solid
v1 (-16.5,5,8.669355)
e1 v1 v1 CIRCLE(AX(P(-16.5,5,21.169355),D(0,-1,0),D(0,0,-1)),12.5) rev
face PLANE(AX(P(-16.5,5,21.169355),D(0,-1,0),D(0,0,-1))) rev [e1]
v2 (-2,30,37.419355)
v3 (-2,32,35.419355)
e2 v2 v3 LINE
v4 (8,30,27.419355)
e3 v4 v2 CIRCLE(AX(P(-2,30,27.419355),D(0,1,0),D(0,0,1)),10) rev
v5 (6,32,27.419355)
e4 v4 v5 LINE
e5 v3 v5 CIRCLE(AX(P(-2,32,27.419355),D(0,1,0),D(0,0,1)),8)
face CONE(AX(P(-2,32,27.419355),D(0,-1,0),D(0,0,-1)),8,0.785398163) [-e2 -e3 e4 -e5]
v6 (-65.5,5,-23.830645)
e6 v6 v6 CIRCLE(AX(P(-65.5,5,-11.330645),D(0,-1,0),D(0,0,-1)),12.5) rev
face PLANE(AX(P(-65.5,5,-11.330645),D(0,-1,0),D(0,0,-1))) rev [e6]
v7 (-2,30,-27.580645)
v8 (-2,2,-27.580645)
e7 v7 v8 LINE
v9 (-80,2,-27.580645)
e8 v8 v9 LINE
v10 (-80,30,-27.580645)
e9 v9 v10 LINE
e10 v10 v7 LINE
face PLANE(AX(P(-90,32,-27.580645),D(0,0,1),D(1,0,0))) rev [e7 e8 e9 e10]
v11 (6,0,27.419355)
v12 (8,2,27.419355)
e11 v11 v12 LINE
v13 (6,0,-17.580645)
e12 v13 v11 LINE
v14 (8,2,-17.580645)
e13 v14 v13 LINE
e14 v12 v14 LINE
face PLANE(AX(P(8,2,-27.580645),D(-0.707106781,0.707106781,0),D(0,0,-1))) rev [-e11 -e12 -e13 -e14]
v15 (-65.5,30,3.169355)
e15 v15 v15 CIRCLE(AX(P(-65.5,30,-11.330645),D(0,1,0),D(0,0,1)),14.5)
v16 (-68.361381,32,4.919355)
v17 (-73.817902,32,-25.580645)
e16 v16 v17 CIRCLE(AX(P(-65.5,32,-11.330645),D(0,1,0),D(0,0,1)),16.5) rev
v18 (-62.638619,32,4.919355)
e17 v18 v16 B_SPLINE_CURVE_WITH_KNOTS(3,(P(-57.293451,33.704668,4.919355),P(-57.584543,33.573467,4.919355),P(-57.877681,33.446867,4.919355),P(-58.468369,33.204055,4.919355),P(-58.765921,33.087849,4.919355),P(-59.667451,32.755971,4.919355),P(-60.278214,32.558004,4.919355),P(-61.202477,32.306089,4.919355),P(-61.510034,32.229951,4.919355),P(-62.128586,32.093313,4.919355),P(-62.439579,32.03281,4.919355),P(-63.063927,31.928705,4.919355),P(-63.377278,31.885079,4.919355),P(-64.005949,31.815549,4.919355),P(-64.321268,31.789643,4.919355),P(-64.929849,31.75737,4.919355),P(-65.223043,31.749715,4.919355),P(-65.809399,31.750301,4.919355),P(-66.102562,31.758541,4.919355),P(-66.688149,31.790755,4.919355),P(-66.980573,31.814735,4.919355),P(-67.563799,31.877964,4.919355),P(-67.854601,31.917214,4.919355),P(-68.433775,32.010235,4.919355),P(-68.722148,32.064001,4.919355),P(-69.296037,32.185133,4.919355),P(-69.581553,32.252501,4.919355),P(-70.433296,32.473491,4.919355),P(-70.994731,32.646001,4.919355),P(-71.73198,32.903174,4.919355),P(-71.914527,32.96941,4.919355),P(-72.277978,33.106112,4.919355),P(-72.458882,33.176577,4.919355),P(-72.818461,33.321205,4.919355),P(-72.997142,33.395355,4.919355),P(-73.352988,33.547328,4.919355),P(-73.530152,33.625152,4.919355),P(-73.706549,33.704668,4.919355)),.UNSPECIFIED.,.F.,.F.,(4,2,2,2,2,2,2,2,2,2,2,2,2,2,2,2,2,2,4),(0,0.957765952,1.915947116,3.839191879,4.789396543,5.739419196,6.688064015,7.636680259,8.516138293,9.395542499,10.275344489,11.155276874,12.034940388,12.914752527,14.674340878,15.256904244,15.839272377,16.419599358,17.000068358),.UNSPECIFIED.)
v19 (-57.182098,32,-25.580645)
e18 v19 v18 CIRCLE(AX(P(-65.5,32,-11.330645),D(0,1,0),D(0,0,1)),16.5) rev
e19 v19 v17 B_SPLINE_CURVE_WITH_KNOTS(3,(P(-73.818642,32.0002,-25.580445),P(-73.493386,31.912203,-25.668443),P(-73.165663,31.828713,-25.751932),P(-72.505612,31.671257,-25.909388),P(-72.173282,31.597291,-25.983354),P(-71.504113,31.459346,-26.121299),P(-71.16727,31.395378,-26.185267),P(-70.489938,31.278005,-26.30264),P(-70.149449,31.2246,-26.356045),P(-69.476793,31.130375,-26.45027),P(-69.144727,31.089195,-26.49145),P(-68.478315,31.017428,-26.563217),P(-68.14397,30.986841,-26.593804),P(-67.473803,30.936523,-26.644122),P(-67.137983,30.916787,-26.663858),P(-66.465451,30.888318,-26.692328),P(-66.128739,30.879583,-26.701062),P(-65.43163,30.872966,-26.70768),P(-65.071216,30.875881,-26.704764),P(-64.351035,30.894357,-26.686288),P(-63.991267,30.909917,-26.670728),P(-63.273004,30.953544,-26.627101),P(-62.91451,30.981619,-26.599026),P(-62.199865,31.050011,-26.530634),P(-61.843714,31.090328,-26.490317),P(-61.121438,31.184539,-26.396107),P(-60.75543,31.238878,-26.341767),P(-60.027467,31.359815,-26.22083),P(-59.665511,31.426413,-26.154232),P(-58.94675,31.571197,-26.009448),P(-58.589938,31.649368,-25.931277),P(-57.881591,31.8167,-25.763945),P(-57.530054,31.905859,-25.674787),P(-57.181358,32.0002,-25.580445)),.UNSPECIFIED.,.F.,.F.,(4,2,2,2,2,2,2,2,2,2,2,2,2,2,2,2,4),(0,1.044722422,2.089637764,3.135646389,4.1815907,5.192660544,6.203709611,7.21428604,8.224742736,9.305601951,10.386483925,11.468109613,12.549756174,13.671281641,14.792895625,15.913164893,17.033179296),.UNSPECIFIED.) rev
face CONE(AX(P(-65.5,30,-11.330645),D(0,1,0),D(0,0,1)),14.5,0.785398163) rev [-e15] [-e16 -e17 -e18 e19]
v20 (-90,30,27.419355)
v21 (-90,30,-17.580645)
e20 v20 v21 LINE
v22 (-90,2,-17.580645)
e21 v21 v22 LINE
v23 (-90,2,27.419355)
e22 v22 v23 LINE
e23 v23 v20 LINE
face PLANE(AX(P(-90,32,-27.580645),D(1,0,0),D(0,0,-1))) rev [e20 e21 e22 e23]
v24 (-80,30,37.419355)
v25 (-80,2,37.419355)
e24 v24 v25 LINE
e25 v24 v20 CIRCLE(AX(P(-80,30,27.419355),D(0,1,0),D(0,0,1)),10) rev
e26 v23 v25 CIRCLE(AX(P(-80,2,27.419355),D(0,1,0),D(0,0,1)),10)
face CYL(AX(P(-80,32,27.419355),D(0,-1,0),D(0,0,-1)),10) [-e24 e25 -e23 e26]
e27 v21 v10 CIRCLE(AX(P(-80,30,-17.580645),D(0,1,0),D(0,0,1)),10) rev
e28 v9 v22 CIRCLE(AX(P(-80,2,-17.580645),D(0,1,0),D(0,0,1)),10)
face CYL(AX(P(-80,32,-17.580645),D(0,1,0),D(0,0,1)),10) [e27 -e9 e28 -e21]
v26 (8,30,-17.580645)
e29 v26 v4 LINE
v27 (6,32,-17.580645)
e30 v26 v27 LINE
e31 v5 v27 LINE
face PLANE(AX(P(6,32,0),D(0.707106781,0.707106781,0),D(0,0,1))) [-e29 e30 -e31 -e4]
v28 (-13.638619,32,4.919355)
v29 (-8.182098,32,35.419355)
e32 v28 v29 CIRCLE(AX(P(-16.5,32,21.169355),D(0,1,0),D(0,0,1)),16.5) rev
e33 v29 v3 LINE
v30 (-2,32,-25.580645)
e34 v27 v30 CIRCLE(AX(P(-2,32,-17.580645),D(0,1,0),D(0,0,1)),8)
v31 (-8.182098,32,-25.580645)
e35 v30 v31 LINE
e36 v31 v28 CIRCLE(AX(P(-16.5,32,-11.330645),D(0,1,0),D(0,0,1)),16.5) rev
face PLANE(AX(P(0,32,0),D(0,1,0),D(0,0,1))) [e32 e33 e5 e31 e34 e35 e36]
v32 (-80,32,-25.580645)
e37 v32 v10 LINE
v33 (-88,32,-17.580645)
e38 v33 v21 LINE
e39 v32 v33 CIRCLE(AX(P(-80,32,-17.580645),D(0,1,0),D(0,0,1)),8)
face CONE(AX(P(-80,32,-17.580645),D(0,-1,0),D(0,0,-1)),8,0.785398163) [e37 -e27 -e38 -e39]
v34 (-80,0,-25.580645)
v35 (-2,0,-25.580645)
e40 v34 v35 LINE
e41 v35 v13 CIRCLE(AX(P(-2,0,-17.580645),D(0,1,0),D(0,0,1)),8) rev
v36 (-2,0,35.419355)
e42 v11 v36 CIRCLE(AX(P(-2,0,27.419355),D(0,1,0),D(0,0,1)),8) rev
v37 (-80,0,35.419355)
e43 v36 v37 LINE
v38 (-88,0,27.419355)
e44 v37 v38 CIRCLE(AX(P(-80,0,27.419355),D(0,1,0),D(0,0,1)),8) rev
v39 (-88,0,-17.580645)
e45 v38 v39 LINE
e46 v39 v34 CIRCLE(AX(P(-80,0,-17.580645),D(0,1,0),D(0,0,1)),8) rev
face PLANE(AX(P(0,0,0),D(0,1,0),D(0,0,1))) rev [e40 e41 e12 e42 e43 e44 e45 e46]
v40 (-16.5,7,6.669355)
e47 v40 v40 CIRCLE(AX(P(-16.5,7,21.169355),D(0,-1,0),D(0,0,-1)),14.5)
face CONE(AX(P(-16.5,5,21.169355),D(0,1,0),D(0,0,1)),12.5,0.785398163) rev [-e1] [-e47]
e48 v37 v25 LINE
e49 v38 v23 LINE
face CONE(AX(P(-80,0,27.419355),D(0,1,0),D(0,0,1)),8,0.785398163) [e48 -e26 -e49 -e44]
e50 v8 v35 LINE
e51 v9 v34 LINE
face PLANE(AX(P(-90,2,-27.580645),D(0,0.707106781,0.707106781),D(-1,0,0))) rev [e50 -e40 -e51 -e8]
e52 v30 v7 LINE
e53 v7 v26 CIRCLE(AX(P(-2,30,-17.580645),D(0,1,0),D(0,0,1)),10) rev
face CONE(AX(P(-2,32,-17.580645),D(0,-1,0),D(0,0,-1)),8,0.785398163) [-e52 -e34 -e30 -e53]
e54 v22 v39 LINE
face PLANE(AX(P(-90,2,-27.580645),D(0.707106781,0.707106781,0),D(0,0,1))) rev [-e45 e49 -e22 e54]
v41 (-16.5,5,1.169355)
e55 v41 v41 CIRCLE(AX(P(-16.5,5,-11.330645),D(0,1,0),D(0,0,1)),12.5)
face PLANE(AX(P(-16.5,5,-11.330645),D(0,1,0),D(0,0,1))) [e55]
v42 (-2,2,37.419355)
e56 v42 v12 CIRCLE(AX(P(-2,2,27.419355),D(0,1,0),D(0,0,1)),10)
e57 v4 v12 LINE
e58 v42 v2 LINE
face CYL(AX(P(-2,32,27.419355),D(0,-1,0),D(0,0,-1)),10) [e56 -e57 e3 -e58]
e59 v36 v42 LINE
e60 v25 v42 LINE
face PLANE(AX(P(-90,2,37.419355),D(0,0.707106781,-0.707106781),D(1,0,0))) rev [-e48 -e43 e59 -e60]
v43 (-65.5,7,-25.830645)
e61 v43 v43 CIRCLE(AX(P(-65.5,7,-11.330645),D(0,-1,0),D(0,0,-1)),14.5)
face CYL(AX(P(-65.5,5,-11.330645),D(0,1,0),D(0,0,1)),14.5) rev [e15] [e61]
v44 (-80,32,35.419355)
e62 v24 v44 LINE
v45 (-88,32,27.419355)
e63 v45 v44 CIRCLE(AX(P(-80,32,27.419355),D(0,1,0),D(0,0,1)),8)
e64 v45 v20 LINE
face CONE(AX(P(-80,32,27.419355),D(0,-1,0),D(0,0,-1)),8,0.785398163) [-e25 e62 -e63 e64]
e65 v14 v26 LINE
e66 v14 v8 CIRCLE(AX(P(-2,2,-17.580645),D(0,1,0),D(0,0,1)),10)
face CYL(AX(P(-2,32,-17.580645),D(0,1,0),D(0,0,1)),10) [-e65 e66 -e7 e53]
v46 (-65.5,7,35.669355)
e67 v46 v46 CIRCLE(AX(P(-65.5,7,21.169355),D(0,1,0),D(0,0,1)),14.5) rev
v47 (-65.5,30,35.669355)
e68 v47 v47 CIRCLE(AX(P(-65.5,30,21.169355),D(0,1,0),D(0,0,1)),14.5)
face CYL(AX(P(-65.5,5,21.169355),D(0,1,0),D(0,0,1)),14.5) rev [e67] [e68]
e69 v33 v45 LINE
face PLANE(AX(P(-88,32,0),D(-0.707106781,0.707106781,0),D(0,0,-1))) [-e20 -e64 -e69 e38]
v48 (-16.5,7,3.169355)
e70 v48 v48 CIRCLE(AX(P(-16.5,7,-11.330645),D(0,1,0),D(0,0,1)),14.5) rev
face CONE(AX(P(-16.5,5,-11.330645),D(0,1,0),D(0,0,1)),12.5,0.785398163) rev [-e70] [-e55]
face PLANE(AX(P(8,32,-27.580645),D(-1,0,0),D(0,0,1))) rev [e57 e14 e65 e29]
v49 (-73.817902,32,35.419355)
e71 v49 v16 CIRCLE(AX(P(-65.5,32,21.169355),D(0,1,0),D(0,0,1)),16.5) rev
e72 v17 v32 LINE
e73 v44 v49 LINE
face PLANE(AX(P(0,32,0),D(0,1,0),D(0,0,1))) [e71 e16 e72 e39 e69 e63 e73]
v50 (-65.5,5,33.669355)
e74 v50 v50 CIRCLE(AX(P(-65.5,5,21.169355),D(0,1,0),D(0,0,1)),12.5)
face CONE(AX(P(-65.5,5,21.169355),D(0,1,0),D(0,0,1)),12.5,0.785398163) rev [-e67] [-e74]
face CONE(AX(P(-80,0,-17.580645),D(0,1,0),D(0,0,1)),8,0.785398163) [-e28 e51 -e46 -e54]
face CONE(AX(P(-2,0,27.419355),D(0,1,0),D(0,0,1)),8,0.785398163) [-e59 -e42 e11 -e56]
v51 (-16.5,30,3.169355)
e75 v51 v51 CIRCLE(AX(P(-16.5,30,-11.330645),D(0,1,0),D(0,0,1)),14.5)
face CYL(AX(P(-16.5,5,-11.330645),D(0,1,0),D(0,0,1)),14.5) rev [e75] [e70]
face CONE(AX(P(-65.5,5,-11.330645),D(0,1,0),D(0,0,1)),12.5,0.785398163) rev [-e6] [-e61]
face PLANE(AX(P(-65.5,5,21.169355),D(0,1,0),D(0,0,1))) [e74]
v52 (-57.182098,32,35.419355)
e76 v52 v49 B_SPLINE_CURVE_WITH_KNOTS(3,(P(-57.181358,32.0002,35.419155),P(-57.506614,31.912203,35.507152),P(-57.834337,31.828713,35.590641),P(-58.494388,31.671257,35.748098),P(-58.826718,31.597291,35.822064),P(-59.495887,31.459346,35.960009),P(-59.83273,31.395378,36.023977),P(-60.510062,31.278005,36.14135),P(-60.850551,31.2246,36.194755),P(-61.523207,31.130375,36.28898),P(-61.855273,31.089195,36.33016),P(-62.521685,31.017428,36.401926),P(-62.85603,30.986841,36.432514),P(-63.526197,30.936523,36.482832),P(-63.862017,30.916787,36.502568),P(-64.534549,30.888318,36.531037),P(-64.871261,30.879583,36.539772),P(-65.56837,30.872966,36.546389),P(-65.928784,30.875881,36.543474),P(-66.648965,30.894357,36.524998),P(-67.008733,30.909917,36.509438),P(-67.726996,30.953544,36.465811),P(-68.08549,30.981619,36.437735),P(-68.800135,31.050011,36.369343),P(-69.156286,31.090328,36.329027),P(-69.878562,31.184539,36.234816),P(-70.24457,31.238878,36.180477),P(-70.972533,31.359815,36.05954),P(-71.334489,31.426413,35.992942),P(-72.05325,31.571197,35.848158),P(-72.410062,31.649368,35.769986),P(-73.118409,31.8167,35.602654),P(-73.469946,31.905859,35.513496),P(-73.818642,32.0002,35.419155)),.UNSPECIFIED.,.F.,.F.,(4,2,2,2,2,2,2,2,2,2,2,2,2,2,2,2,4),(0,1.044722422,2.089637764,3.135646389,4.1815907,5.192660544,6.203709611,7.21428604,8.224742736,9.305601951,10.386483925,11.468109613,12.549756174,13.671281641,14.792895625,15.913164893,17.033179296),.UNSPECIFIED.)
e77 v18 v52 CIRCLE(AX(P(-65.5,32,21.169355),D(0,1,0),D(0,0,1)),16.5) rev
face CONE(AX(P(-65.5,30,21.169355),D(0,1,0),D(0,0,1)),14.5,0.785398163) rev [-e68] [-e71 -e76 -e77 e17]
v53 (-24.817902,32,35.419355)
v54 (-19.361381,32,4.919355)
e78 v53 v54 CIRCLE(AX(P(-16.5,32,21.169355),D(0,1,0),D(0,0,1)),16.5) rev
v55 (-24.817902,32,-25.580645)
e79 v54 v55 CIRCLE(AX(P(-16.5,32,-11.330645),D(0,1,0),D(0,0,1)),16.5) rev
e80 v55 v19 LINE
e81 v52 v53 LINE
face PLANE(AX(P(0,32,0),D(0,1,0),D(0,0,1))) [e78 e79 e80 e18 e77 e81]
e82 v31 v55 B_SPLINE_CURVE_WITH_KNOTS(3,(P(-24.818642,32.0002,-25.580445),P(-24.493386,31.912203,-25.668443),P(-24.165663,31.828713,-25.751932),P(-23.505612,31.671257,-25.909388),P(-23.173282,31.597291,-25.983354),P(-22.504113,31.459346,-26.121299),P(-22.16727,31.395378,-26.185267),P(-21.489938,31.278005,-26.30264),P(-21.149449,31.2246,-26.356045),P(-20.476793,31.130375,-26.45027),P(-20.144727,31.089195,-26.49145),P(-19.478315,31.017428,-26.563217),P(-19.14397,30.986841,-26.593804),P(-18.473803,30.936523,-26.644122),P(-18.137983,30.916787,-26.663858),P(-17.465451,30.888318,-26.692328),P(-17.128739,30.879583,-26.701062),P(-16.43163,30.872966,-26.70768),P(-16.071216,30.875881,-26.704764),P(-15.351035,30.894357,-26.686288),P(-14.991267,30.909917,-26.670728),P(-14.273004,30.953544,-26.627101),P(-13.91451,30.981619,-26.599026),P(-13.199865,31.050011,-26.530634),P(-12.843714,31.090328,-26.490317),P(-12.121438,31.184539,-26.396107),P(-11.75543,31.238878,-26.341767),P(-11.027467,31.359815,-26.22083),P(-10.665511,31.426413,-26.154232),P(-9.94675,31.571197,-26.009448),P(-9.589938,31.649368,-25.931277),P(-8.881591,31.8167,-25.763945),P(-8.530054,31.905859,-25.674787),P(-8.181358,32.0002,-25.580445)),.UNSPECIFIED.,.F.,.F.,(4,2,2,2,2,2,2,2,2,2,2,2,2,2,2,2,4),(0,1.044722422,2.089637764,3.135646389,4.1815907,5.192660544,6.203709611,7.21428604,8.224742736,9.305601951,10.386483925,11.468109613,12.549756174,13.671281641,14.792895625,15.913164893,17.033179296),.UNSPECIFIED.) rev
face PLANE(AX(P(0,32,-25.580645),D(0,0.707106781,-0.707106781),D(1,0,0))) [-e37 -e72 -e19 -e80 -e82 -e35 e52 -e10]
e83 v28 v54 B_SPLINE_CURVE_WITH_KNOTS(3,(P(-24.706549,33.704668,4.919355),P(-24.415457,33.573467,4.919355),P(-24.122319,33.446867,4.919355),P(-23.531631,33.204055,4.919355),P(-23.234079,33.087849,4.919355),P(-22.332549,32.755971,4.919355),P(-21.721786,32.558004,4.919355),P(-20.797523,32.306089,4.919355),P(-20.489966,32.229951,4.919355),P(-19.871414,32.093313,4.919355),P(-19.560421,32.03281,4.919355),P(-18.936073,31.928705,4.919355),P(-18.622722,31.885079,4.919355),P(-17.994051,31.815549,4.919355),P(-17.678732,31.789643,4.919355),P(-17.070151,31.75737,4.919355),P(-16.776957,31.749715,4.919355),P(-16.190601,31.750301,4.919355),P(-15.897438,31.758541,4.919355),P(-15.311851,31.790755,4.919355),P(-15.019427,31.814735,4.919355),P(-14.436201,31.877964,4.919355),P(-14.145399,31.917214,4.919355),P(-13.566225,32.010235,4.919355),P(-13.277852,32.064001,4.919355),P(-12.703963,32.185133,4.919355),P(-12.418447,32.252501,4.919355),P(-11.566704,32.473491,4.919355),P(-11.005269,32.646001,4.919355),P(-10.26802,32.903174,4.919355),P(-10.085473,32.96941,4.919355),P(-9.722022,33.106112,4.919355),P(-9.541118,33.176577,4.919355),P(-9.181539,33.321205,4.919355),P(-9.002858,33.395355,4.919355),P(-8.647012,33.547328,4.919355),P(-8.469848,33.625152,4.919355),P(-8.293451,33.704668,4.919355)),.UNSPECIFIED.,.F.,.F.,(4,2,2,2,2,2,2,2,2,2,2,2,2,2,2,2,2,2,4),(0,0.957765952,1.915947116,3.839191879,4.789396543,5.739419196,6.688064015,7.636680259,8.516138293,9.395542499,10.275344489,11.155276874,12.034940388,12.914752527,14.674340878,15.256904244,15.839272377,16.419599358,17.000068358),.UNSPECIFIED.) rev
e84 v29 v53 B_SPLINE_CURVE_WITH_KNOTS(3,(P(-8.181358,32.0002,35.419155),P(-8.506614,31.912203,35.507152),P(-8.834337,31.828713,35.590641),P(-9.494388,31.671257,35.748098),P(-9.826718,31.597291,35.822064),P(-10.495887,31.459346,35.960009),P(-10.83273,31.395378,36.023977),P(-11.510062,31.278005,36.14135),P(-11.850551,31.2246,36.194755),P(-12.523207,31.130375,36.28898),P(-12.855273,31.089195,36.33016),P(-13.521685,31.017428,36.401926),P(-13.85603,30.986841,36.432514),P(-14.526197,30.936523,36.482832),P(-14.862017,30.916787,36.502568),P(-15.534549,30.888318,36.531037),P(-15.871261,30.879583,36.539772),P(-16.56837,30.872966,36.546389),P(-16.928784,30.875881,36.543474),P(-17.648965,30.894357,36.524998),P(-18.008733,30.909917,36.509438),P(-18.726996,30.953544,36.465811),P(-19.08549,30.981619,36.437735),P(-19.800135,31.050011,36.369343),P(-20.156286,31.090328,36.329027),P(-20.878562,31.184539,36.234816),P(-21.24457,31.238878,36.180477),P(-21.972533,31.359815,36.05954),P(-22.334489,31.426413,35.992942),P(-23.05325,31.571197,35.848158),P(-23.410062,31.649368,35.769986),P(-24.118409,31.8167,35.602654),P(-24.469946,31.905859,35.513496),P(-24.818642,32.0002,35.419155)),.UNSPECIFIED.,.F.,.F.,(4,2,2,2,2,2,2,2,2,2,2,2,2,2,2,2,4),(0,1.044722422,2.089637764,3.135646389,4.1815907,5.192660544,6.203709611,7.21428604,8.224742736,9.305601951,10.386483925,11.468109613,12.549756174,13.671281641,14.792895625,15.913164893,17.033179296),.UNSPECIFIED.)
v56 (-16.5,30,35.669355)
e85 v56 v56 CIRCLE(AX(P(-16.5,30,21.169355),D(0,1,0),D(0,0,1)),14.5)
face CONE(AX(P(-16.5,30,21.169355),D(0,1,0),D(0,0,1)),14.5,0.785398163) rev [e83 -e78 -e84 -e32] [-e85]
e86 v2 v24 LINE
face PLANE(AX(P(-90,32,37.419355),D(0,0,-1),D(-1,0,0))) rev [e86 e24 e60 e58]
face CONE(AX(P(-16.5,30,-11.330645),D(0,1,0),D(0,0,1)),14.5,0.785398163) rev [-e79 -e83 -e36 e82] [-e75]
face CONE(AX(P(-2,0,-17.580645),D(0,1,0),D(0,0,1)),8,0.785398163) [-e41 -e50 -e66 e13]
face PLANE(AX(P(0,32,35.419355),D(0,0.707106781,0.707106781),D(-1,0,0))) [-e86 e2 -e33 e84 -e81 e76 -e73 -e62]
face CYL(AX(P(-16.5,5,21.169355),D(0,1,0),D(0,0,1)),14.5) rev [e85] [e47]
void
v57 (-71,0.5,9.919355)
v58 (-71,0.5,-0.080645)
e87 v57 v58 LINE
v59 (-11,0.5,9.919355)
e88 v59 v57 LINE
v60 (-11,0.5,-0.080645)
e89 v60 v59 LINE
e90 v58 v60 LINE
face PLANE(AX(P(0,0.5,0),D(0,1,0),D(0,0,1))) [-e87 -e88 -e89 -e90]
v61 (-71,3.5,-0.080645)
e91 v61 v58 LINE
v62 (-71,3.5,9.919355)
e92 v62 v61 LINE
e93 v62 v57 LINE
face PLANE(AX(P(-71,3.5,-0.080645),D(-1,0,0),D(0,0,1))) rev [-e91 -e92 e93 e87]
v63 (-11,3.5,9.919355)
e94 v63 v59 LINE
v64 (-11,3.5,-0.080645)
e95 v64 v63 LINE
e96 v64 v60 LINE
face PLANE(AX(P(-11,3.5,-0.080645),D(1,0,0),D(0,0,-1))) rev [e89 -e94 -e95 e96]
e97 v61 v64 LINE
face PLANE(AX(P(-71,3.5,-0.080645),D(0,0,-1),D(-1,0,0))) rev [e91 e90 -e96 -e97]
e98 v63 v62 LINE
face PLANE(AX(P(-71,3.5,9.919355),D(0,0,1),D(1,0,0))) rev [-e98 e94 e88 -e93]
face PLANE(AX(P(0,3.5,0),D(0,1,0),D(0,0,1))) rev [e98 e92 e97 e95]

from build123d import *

# Parameters (mm, degrees)
SKETCH1_W           = 98
SKETCH1_H           = 65
BOSS_EXTRUDE1_DEPTH = 32
SKETCH2_R           = 14.5
CUT_EXTRUDE1_DEPTH  = 27
FILLET1_R           = 10
FILLET2_R           = 10
FILLET3_R           = 10
FILLET4_R           = 10
CHAMFER1_SIZE       = 2
CUT_EXTRUDE2_START  = -0.5
SKETCH3_W           = 60
SKETCH3_H           = 10
CUT_EXTRUDE2_DEPTH  = 3


with BuildPart() as part:
    # Sketch1 → Boss-Extrude1 (new body)
    with BuildSketch(Plane(origin=(0, 0, 0), x_dir=(1, 0, 0), z_dir=(0, 1, 0))):
        with Locations((-41, -4.919354839)):
            Rectangle(SKETCH1_W, SKETCH1_H)
    extrude(amount=BOSS_EXTRUDE1_DEPTH)

    # Sketch2 → Cut-Extrude1 (cut)
    with BuildSketch(Plane(origin=(0, 32, 0), x_dir=(1, 0, 0), z_dir=(0, 1, 0))):
        with Locations(Location((-16.5, 11.330645161, 0), (0, 0, 270))):
            Circle(SKETCH2_R)
        with Locations(Location((-16.5, -21.169354839, 0), (0, 0, 90))):
            Circle(SKETCH2_R)
        with Locations(Location((-65.5, 11.330645161, 0), (0, 0, 90))):
            Circle(SKETCH2_R)
        with Locations(Location((-65.5, -21.169354839, 0), (0, 0, 270))):
            Circle(SKETCH2_R)
    extrude(amount=-CUT_EXTRUDE1_DEPTH, mode=Mode.SUBTRACT)

    # Fillet1
    fillet1_edges = [part.edges().sort_by_distance(p)[0] for p in [
        (8, 16, -27.580645161),
    ]]
    fillet(fillet1_edges, radius=FILLET1_R)

    # Fillet2
    fillet2_edges = [part.edges().sort_by_distance(p)[0] for p in [
        (-90, 16, 37.419354839),
    ]]
    fillet(fillet2_edges, radius=FILLET2_R)

    # Fillet3
    fillet3_edges = [part.edges().sort_by_distance(p)[0] for p in [
        (-90, 16, -27.580645161),
    ]]
    fillet(fillet3_edges, radius=FILLET3_R)

    # Fillet4
    fillet4_edges = [part.edges().sort_by_distance(p)[0] for p in [
        (8, 16, 37.419354839),
    ]]
    fillet(fillet4_edges, radius=FILLET4_R)

    # Chamfer1
    # the kernel refuses this chamfer: 2 mm, written as the material it adds along each edge
    with BuildSketch(Plane(origin=(-16.5, 5, 21.169354839), x_dir=(0, 0, -1), z_dir=(1, 0, 0))) as chamfer1_piece_1:
        Polygon((14.5, CHAMFER1_SIZE), (14.5 - CHAMFER1_SIZE, 0), (14.5, 0), align=None)
    revolve(axis=Axis((-16.5, 5, 21.169354839), (0, 1, 0)))
    with BuildSketch(Plane(origin=(-65.5, 5, -11.330645161), x_dir=(0, 0, -1), z_dir=(1, 0, 0))) as chamfer1_piece_2:
        Polygon((14.5, CHAMFER1_SIZE), (14.5 - CHAMFER1_SIZE, 0), (14.5, 0), align=None)
    revolve(axis=Axis((-65.5, 5, -11.330645161), (0, 1, 0)))
    with BuildSketch(Plane(origin=(-65.5, 5, 21.169354839), x_dir=(0, 0, 1), z_dir=(-1, 0, 0))) as chamfer1_piece_3:
        Polygon((14.5, CHAMFER1_SIZE), (14.5 - CHAMFER1_SIZE, 0), (14.5, 0), align=None)
    revolve(axis=Axis((-65.5, 5, 21.169354839), (0, 1, 0)))
    with BuildSketch(Plane(origin=(-16.5, 5, -11.330645161), x_dir=(0, 0, 1), z_dir=(-1, 0, 0))) as chamfer1_piece_4:
        Polygon((14.5, CHAMFER1_SIZE), (14.5 - CHAMFER1_SIZE, 0), (14.5, 0), align=None)
    revolve(axis=Axis((-16.5, 5, -11.330645161), (0, 1, 0)))
    # the kernel refuses this chamfer: 2 mm, written as the material it takes off along each edge
    with BuildSketch(Plane(origin=(-16.5, 32, 21.169354839), x_dir=(0, 0, -1), z_dir=(1, 0, 0))) as chamfer1_2_piece_1:
        Polygon((14.5 + CHAMFER1_SIZE, 0), (14.5, -CHAMFER1_SIZE), (14.5, 0), align=None)
    revolve(axis=Axis((-16.5, 32, 21.169354839), (0, 1, 0)), mode=Mode.SUBTRACT)
    with BuildSketch(Plane(origin=(-65.5, 32, -11.330645161), x_dir=(0, 0, -1), z_dir=(1, 0, 0))) as chamfer1_2_piece_2:
        Polygon((14.5 + CHAMFER1_SIZE, 0), (14.5, -CHAMFER1_SIZE), (14.5, 0), align=None)
    revolve(axis=Axis((-65.5, 32, -11.330645161), (0, 1, 0)), mode=Mode.SUBTRACT)
    with BuildSketch(Plane(origin=(-65.5, 32, 21.169354839), x_dir=(0, 0, 1), z_dir=(-1, 0, 0))) as chamfer1_2_piece_3:
        Polygon((14.5 + CHAMFER1_SIZE, 0), (14.5, -CHAMFER1_SIZE), (14.5, 0), align=None)
    revolve(axis=Axis((-65.5, 32, 21.169354839), (0, 1, 0)), mode=Mode.SUBTRACT)
    with BuildSketch(Plane(origin=(-16.5, 32, -11.330645161), x_dir=(0, 0, 1), z_dir=(-1, 0, 0))) as chamfer1_2_piece_4:
        Polygon((14.5 + CHAMFER1_SIZE, 0), (14.5, -CHAMFER1_SIZE), (14.5, 0), align=None)
    revolve(axis=Axis((-16.5, 32, -11.330645161), (0, 1, 0)), mode=Mode.SUBTRACT)
    with BuildSketch(Plane(origin=(-80, 0, -27.580645161), x_dir=(0, -0.02749587661058639, 0.9996219169112968), z_dir=(1, 0, 0)), Plane(origin=(-80, 32, -27.580645161), x_dir=(0, -0.9996219169112968, -0.027495876610585647), z_dir=(1, 0, 0)), Plane(origin=(-2, 0, 37.419354839), x_dir=(0, -0.02749587661058639, -0.9996219169112968), z_dir=(-1, 0, 0)), Plane(origin=(-2, 32, 37.419354839), x_dir=(0, -0.9996219169112968, 0.027495876610585647), z_dir=(-1, 0, 0))) as chamfer1_2_piece_5:
        Polygon((CHAMFER1_SIZE * 0.999621916911, -CHAMFER1_SIZE * 0.0274958766106), (-CHAMFER1_SIZE * 0.0274958766106, -CHAMFER1_SIZE * 0.999621916911), (0, 0), align=None)
    extrude(amount=78, mode=Mode.SUBTRACT)
    with BuildSketch(Plane(origin=(-2, 0, -17.580645161), x_dir=(0, 0, -1), z_dir=(-1, 0, 0))) as chamfer1_2_piece_6:
        Polygon((10 - CHAMFER1_SIZE, 0), (10, -CHAMFER1_SIZE), (10, 0), align=None)
    revolve(axis=Axis((-2, 0, -17.580645161), (0, -1, 0)), revolution_arc=90, mode=Mode.SUBTRACT)
    with BuildSketch(Plane(origin=(-2, 32, -17.580645161), x_dir=(0, 0, -1), z_dir=(-1, 0, 0))) as chamfer1_2_piece_7:
        Polygon((10, CHAMFER1_SIZE), (10 - CHAMFER1_SIZE, 0), (10, 0), align=None)
    revolve(axis=Axis((-2, 32, -17.580645161), (0, -1, 0)), revolution_arc=90, mode=Mode.SUBTRACT)
    with BuildSketch(Plane(origin=(-80, 32, 27.419354839), x_dir=(-1, 0, 0), z_dir=(0, 0, -1))) as chamfer1_2_piece_8:
        Polygon((10, -CHAMFER1_SIZE), (10 - CHAMFER1_SIZE, 0), (10, 0), align=None)
    revolve(axis=Axis((-80, 32, 27.419354839), (0, 1, 0)), revolution_arc=90, mode=Mode.SUBTRACT)
    with BuildSketch(Plane(origin=(-80, 0, 27.419354839), x_dir=(-1, 0, 0), z_dir=(0, 0, -1))) as chamfer1_2_piece_9:
        Polygon((10 - CHAMFER1_SIZE, 0), (10, CHAMFER1_SIZE), (10, 0), align=None)
    revolve(axis=Axis((-80, 0, 27.419354839), (0, 1, 0)), revolution_arc=90, mode=Mode.SUBTRACT)
    with BuildSketch(Plane(origin=(-90, 0, 27.419354839), x_dir=(0.9996219169112968, -0.027495876610586292, 0), z_dir=(0, 0, -1)), Plane(origin=(-90, 32, 27.419354839), x_dir=(-0.0274958766105891, -0.9996219169112968, 0), z_dir=(0, 0, -1)), Plane(origin=(8, 0, -17.580645161), x_dir=(-0.9996219169112968, -0.027495876610586438, 0), z_dir=(0, 0, 1)), Plane(origin=(8, 32, -17.580645161), x_dir=(0.02749587661058651, -0.9996219169112968, 0), z_dir=(0, 0, 1))) as chamfer1_2_piece_10:
        Polygon((CHAMFER1_SIZE * 0.999621916911, -CHAMFER1_SIZE * 0.0274958766106), (-CHAMFER1_SIZE * 0.0274958766106, -CHAMFER1_SIZE * 0.999621916911), (0, 0), align=None)
    extrude(amount=45, mode=Mode.SUBTRACT)
    with BuildSketch(Plane(origin=(-80, 0, -17.580645161), x_dir=(-1, 0, 0), z_dir=(0, 0, 1))) as chamfer1_2_piece_11:
        Polygon((10 - CHAMFER1_SIZE, 0), (10, -CHAMFER1_SIZE), (10, 0), align=None)
    revolve(axis=Axis((-80, 0, -17.580645161), (0, -1, 0)), revolution_arc=90, mode=Mode.SUBTRACT)
    with BuildSketch(Plane(origin=(-80, 32, -17.580645161), x_dir=(-1, 0, 0), z_dir=(0, 0, 1))) as chamfer1_2_piece_12:
        Polygon((10, CHAMFER1_SIZE), (10 - CHAMFER1_SIZE, 0), (10, 0), align=None)
    revolve(axis=Axis((-80, 32, -17.580645161), (0, -1, 0)), revolution_arc=90, mode=Mode.SUBTRACT)
    with BuildSketch(Plane(origin=(-2, 32, 27.419354839), x_dir=(0, 0, 1), z_dir=(-1, 0, 0))) as chamfer1_2_piece_13:
        Polygon((10, -CHAMFER1_SIZE), (10 - CHAMFER1_SIZE, 0), (10, 0), align=None)
    revolve(axis=Axis((-2, 32, 27.419354839), (0, 1, 0)), revolution_arc=90, mode=Mode.SUBTRACT)
    with BuildSketch(Plane(origin=(-2, 0, 27.419354839), x_dir=(0, 0, 1), z_dir=(-1, 0, 0))) as chamfer1_2_piece_14:
        Polygon((10 - CHAMFER1_SIZE, 0), (10, CHAMFER1_SIZE), (10, 0), align=None)
    revolve(axis=Axis((-2, 0, 27.419354839), (0, 1, 0)), revolution_arc=90, mode=Mode.SUBTRACT)

    # Sketch3 → Cut-Extrude2 (cut)
    with BuildSketch(Plane.XZ.offset(CUT_EXTRUDE2_START)):
        with Locations((-41, 4.919354839)):
            Rectangle(SKETCH3_W, SKETCH3_H)
    extrude(amount=-CUT_EXTRUDE2_DEPTH, mode=Mode.SUBTRACT)


solid = part.part
